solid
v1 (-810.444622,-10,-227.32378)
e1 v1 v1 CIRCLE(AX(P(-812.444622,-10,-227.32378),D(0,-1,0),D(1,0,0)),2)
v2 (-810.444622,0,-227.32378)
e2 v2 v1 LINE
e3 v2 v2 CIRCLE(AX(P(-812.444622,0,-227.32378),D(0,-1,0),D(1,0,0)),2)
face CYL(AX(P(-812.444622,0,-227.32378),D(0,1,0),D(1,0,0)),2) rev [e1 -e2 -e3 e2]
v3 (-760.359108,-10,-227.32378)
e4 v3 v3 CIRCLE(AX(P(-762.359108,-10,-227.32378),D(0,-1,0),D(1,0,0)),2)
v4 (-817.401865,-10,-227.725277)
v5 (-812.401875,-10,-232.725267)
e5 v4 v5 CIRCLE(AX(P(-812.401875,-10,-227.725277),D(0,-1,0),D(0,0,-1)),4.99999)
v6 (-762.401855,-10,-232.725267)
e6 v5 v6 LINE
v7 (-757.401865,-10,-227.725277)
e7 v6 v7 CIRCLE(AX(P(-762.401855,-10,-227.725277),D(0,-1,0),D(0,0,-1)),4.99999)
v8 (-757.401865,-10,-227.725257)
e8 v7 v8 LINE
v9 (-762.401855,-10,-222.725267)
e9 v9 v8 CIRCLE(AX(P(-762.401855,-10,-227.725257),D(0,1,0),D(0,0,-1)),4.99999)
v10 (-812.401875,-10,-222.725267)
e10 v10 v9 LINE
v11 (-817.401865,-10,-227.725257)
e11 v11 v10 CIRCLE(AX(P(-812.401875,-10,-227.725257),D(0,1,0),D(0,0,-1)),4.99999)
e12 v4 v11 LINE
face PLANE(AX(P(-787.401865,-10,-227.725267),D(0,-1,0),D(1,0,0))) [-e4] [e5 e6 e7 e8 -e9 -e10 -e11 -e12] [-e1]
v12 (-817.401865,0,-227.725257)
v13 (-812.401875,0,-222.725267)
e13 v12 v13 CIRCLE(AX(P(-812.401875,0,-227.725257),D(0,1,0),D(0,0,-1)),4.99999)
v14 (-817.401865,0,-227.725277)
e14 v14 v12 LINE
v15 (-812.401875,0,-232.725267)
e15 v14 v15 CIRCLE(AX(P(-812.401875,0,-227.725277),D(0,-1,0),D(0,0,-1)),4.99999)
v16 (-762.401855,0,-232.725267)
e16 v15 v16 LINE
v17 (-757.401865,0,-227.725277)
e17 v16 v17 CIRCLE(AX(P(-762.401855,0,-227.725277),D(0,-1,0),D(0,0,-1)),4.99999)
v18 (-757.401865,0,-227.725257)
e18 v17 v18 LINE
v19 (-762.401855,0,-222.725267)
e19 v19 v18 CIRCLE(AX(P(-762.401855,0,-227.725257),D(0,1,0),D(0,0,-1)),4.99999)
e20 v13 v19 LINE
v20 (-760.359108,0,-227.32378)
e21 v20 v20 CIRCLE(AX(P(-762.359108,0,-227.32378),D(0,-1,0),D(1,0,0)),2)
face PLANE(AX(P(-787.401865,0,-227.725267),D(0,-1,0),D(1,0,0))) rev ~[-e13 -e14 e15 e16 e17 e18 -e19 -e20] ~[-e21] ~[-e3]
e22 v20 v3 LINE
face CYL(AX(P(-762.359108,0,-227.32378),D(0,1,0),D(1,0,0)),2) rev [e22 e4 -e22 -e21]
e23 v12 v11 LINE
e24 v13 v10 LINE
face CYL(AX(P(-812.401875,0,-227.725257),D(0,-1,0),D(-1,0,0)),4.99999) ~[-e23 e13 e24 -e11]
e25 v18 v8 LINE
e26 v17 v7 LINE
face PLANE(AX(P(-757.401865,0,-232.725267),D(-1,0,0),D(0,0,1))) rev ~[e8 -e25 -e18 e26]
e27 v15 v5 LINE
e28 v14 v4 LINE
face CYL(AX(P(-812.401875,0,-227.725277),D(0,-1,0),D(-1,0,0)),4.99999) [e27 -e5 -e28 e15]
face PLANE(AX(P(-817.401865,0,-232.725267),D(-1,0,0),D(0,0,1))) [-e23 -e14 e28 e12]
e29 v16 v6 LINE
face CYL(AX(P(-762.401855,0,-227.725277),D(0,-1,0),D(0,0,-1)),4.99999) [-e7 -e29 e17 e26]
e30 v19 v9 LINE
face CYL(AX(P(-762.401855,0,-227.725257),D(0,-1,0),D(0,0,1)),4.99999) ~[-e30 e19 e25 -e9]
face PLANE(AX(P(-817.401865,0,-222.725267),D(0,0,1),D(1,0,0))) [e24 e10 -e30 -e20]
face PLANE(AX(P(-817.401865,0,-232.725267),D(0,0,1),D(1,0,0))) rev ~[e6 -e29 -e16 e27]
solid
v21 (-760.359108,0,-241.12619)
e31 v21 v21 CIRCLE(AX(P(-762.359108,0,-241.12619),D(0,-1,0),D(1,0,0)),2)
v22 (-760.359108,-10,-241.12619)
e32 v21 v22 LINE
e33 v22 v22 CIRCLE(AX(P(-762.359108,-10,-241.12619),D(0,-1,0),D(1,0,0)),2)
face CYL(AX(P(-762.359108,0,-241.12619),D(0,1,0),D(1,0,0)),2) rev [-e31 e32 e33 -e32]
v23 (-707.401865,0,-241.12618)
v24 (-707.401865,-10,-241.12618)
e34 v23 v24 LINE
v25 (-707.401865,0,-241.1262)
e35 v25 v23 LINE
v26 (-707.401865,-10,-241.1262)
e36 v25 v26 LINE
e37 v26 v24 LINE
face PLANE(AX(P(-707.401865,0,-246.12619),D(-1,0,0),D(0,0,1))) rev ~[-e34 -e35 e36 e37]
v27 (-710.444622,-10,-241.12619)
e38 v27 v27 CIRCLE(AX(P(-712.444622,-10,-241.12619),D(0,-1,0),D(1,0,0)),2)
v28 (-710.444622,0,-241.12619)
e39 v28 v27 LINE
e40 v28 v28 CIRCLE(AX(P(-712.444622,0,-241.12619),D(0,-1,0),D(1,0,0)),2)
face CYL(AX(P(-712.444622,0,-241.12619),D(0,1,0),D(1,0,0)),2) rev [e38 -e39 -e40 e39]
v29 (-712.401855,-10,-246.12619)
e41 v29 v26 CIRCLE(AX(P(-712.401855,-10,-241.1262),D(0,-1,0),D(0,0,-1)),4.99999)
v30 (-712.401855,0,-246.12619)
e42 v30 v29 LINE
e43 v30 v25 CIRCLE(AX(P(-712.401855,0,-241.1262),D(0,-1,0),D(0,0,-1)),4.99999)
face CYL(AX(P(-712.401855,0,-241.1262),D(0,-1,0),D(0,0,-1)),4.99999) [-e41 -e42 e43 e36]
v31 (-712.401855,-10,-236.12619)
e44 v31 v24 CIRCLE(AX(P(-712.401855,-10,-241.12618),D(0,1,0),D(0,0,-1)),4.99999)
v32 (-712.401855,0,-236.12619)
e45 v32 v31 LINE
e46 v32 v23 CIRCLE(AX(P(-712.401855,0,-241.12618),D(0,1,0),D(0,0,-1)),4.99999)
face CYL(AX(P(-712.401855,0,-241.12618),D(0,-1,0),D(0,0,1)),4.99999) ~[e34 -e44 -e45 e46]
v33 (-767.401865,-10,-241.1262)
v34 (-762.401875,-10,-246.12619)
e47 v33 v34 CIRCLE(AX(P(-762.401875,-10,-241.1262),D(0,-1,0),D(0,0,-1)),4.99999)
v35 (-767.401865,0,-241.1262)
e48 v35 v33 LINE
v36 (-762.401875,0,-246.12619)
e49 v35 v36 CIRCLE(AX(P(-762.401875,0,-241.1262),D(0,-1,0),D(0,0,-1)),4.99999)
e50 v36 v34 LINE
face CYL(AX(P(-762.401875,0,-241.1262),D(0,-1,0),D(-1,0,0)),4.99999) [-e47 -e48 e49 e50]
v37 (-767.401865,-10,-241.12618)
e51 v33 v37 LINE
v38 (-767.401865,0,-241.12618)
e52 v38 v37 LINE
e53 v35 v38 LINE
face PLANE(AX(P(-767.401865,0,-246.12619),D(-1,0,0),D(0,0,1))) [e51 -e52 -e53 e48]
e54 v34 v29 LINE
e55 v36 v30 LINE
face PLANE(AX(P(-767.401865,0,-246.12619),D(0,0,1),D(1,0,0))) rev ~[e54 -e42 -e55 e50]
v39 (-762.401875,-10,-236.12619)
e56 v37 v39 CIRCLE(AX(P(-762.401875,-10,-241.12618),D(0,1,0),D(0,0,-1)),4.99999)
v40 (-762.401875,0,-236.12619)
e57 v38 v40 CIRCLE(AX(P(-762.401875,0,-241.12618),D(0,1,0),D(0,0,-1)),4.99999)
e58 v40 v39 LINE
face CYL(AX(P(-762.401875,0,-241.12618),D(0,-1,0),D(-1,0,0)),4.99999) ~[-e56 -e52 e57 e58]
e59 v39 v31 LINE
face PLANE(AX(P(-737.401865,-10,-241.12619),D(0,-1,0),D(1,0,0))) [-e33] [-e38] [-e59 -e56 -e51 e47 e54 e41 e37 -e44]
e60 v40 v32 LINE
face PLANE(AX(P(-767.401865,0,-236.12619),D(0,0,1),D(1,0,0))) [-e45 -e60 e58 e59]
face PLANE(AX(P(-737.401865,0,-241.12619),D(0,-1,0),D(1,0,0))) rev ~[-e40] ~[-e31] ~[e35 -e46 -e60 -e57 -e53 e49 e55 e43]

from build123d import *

# Parameters (mm, degrees)
F0_W     = 60
F0_H     = 10
F0_R     = 2
F1_DEPTH = 10
F2_R     = 4.99999
F2_2_R   = 4.99999


# Not quite as in the source:
# - a fillet or chamfer is up to 0.001 mm smaller than in the source, because OpenCascade refuses the exact size


with BuildPart() as f1:
    # F0 (on Front) → F1 (new body)
    with BuildSketch(Plane.XZ):
        with Locations((-787.4018650077, -227.7252674103)):
            Rectangle(F0_W, F0_H)
        with Locations((-812.4446220431, -227.3237803578)):
            Circle(F0_R, mode=Mode.SUBTRACT)
        with Locations((-762.3591079723, -227.3237803578)):
            Circle(F0_R, mode=Mode.SUBTRACT)
    extrude(amount=F1_DEPTH)

    # F2 (radius 5 in the source; OpenCascade refuses exactly that, so slightly less here)
    f2_edges = [f1.edges().sort_by_distance(p)[0] for p in [
        (-757.401865, -5, -222.725267),
        (-757.401865, -5, -232.725267),
        (-817.401865, -5, -222.725267),
        (-817.401865, -5, -232.725267),
    ]]
    fillet(f2_edges, radius=F2_R)


with BuildPart() as f1b:
    # F0 (on Front) → F1, piece 2 (new body)
    with BuildSketch(Plane.XZ):
        with Locations((-737.4018650077, -241.1261898279)):
            Rectangle(F0_W, F0_H)
        with Locations((-762.3591079723, -241.1261898279)):
            Circle(F0_R, mode=Mode.SUBTRACT)
        with Locations((-712.4446220431, -241.1261898279)):
            Circle(F0_R, mode=Mode.SUBTRACT)
    extrude(amount=F1_DEPTH)

    # F2#2 (radius 5 in the source; OpenCascade refuses exactly that, so slightly less here)
    f2_2_edges = [f1b.edges().sort_by_distance(p)[0] for p in [
        (-767.401865, -5, -236.12619),
        (-767.401865, -5, -246.12619),
        (-707.401865, -5, -236.12619),
        (-707.401865, -5, -246.12619),
    ]]
    fillet(f2_2_edges, radius=F2_2_R)


solid = Compound([f1.part, f1b.part])
